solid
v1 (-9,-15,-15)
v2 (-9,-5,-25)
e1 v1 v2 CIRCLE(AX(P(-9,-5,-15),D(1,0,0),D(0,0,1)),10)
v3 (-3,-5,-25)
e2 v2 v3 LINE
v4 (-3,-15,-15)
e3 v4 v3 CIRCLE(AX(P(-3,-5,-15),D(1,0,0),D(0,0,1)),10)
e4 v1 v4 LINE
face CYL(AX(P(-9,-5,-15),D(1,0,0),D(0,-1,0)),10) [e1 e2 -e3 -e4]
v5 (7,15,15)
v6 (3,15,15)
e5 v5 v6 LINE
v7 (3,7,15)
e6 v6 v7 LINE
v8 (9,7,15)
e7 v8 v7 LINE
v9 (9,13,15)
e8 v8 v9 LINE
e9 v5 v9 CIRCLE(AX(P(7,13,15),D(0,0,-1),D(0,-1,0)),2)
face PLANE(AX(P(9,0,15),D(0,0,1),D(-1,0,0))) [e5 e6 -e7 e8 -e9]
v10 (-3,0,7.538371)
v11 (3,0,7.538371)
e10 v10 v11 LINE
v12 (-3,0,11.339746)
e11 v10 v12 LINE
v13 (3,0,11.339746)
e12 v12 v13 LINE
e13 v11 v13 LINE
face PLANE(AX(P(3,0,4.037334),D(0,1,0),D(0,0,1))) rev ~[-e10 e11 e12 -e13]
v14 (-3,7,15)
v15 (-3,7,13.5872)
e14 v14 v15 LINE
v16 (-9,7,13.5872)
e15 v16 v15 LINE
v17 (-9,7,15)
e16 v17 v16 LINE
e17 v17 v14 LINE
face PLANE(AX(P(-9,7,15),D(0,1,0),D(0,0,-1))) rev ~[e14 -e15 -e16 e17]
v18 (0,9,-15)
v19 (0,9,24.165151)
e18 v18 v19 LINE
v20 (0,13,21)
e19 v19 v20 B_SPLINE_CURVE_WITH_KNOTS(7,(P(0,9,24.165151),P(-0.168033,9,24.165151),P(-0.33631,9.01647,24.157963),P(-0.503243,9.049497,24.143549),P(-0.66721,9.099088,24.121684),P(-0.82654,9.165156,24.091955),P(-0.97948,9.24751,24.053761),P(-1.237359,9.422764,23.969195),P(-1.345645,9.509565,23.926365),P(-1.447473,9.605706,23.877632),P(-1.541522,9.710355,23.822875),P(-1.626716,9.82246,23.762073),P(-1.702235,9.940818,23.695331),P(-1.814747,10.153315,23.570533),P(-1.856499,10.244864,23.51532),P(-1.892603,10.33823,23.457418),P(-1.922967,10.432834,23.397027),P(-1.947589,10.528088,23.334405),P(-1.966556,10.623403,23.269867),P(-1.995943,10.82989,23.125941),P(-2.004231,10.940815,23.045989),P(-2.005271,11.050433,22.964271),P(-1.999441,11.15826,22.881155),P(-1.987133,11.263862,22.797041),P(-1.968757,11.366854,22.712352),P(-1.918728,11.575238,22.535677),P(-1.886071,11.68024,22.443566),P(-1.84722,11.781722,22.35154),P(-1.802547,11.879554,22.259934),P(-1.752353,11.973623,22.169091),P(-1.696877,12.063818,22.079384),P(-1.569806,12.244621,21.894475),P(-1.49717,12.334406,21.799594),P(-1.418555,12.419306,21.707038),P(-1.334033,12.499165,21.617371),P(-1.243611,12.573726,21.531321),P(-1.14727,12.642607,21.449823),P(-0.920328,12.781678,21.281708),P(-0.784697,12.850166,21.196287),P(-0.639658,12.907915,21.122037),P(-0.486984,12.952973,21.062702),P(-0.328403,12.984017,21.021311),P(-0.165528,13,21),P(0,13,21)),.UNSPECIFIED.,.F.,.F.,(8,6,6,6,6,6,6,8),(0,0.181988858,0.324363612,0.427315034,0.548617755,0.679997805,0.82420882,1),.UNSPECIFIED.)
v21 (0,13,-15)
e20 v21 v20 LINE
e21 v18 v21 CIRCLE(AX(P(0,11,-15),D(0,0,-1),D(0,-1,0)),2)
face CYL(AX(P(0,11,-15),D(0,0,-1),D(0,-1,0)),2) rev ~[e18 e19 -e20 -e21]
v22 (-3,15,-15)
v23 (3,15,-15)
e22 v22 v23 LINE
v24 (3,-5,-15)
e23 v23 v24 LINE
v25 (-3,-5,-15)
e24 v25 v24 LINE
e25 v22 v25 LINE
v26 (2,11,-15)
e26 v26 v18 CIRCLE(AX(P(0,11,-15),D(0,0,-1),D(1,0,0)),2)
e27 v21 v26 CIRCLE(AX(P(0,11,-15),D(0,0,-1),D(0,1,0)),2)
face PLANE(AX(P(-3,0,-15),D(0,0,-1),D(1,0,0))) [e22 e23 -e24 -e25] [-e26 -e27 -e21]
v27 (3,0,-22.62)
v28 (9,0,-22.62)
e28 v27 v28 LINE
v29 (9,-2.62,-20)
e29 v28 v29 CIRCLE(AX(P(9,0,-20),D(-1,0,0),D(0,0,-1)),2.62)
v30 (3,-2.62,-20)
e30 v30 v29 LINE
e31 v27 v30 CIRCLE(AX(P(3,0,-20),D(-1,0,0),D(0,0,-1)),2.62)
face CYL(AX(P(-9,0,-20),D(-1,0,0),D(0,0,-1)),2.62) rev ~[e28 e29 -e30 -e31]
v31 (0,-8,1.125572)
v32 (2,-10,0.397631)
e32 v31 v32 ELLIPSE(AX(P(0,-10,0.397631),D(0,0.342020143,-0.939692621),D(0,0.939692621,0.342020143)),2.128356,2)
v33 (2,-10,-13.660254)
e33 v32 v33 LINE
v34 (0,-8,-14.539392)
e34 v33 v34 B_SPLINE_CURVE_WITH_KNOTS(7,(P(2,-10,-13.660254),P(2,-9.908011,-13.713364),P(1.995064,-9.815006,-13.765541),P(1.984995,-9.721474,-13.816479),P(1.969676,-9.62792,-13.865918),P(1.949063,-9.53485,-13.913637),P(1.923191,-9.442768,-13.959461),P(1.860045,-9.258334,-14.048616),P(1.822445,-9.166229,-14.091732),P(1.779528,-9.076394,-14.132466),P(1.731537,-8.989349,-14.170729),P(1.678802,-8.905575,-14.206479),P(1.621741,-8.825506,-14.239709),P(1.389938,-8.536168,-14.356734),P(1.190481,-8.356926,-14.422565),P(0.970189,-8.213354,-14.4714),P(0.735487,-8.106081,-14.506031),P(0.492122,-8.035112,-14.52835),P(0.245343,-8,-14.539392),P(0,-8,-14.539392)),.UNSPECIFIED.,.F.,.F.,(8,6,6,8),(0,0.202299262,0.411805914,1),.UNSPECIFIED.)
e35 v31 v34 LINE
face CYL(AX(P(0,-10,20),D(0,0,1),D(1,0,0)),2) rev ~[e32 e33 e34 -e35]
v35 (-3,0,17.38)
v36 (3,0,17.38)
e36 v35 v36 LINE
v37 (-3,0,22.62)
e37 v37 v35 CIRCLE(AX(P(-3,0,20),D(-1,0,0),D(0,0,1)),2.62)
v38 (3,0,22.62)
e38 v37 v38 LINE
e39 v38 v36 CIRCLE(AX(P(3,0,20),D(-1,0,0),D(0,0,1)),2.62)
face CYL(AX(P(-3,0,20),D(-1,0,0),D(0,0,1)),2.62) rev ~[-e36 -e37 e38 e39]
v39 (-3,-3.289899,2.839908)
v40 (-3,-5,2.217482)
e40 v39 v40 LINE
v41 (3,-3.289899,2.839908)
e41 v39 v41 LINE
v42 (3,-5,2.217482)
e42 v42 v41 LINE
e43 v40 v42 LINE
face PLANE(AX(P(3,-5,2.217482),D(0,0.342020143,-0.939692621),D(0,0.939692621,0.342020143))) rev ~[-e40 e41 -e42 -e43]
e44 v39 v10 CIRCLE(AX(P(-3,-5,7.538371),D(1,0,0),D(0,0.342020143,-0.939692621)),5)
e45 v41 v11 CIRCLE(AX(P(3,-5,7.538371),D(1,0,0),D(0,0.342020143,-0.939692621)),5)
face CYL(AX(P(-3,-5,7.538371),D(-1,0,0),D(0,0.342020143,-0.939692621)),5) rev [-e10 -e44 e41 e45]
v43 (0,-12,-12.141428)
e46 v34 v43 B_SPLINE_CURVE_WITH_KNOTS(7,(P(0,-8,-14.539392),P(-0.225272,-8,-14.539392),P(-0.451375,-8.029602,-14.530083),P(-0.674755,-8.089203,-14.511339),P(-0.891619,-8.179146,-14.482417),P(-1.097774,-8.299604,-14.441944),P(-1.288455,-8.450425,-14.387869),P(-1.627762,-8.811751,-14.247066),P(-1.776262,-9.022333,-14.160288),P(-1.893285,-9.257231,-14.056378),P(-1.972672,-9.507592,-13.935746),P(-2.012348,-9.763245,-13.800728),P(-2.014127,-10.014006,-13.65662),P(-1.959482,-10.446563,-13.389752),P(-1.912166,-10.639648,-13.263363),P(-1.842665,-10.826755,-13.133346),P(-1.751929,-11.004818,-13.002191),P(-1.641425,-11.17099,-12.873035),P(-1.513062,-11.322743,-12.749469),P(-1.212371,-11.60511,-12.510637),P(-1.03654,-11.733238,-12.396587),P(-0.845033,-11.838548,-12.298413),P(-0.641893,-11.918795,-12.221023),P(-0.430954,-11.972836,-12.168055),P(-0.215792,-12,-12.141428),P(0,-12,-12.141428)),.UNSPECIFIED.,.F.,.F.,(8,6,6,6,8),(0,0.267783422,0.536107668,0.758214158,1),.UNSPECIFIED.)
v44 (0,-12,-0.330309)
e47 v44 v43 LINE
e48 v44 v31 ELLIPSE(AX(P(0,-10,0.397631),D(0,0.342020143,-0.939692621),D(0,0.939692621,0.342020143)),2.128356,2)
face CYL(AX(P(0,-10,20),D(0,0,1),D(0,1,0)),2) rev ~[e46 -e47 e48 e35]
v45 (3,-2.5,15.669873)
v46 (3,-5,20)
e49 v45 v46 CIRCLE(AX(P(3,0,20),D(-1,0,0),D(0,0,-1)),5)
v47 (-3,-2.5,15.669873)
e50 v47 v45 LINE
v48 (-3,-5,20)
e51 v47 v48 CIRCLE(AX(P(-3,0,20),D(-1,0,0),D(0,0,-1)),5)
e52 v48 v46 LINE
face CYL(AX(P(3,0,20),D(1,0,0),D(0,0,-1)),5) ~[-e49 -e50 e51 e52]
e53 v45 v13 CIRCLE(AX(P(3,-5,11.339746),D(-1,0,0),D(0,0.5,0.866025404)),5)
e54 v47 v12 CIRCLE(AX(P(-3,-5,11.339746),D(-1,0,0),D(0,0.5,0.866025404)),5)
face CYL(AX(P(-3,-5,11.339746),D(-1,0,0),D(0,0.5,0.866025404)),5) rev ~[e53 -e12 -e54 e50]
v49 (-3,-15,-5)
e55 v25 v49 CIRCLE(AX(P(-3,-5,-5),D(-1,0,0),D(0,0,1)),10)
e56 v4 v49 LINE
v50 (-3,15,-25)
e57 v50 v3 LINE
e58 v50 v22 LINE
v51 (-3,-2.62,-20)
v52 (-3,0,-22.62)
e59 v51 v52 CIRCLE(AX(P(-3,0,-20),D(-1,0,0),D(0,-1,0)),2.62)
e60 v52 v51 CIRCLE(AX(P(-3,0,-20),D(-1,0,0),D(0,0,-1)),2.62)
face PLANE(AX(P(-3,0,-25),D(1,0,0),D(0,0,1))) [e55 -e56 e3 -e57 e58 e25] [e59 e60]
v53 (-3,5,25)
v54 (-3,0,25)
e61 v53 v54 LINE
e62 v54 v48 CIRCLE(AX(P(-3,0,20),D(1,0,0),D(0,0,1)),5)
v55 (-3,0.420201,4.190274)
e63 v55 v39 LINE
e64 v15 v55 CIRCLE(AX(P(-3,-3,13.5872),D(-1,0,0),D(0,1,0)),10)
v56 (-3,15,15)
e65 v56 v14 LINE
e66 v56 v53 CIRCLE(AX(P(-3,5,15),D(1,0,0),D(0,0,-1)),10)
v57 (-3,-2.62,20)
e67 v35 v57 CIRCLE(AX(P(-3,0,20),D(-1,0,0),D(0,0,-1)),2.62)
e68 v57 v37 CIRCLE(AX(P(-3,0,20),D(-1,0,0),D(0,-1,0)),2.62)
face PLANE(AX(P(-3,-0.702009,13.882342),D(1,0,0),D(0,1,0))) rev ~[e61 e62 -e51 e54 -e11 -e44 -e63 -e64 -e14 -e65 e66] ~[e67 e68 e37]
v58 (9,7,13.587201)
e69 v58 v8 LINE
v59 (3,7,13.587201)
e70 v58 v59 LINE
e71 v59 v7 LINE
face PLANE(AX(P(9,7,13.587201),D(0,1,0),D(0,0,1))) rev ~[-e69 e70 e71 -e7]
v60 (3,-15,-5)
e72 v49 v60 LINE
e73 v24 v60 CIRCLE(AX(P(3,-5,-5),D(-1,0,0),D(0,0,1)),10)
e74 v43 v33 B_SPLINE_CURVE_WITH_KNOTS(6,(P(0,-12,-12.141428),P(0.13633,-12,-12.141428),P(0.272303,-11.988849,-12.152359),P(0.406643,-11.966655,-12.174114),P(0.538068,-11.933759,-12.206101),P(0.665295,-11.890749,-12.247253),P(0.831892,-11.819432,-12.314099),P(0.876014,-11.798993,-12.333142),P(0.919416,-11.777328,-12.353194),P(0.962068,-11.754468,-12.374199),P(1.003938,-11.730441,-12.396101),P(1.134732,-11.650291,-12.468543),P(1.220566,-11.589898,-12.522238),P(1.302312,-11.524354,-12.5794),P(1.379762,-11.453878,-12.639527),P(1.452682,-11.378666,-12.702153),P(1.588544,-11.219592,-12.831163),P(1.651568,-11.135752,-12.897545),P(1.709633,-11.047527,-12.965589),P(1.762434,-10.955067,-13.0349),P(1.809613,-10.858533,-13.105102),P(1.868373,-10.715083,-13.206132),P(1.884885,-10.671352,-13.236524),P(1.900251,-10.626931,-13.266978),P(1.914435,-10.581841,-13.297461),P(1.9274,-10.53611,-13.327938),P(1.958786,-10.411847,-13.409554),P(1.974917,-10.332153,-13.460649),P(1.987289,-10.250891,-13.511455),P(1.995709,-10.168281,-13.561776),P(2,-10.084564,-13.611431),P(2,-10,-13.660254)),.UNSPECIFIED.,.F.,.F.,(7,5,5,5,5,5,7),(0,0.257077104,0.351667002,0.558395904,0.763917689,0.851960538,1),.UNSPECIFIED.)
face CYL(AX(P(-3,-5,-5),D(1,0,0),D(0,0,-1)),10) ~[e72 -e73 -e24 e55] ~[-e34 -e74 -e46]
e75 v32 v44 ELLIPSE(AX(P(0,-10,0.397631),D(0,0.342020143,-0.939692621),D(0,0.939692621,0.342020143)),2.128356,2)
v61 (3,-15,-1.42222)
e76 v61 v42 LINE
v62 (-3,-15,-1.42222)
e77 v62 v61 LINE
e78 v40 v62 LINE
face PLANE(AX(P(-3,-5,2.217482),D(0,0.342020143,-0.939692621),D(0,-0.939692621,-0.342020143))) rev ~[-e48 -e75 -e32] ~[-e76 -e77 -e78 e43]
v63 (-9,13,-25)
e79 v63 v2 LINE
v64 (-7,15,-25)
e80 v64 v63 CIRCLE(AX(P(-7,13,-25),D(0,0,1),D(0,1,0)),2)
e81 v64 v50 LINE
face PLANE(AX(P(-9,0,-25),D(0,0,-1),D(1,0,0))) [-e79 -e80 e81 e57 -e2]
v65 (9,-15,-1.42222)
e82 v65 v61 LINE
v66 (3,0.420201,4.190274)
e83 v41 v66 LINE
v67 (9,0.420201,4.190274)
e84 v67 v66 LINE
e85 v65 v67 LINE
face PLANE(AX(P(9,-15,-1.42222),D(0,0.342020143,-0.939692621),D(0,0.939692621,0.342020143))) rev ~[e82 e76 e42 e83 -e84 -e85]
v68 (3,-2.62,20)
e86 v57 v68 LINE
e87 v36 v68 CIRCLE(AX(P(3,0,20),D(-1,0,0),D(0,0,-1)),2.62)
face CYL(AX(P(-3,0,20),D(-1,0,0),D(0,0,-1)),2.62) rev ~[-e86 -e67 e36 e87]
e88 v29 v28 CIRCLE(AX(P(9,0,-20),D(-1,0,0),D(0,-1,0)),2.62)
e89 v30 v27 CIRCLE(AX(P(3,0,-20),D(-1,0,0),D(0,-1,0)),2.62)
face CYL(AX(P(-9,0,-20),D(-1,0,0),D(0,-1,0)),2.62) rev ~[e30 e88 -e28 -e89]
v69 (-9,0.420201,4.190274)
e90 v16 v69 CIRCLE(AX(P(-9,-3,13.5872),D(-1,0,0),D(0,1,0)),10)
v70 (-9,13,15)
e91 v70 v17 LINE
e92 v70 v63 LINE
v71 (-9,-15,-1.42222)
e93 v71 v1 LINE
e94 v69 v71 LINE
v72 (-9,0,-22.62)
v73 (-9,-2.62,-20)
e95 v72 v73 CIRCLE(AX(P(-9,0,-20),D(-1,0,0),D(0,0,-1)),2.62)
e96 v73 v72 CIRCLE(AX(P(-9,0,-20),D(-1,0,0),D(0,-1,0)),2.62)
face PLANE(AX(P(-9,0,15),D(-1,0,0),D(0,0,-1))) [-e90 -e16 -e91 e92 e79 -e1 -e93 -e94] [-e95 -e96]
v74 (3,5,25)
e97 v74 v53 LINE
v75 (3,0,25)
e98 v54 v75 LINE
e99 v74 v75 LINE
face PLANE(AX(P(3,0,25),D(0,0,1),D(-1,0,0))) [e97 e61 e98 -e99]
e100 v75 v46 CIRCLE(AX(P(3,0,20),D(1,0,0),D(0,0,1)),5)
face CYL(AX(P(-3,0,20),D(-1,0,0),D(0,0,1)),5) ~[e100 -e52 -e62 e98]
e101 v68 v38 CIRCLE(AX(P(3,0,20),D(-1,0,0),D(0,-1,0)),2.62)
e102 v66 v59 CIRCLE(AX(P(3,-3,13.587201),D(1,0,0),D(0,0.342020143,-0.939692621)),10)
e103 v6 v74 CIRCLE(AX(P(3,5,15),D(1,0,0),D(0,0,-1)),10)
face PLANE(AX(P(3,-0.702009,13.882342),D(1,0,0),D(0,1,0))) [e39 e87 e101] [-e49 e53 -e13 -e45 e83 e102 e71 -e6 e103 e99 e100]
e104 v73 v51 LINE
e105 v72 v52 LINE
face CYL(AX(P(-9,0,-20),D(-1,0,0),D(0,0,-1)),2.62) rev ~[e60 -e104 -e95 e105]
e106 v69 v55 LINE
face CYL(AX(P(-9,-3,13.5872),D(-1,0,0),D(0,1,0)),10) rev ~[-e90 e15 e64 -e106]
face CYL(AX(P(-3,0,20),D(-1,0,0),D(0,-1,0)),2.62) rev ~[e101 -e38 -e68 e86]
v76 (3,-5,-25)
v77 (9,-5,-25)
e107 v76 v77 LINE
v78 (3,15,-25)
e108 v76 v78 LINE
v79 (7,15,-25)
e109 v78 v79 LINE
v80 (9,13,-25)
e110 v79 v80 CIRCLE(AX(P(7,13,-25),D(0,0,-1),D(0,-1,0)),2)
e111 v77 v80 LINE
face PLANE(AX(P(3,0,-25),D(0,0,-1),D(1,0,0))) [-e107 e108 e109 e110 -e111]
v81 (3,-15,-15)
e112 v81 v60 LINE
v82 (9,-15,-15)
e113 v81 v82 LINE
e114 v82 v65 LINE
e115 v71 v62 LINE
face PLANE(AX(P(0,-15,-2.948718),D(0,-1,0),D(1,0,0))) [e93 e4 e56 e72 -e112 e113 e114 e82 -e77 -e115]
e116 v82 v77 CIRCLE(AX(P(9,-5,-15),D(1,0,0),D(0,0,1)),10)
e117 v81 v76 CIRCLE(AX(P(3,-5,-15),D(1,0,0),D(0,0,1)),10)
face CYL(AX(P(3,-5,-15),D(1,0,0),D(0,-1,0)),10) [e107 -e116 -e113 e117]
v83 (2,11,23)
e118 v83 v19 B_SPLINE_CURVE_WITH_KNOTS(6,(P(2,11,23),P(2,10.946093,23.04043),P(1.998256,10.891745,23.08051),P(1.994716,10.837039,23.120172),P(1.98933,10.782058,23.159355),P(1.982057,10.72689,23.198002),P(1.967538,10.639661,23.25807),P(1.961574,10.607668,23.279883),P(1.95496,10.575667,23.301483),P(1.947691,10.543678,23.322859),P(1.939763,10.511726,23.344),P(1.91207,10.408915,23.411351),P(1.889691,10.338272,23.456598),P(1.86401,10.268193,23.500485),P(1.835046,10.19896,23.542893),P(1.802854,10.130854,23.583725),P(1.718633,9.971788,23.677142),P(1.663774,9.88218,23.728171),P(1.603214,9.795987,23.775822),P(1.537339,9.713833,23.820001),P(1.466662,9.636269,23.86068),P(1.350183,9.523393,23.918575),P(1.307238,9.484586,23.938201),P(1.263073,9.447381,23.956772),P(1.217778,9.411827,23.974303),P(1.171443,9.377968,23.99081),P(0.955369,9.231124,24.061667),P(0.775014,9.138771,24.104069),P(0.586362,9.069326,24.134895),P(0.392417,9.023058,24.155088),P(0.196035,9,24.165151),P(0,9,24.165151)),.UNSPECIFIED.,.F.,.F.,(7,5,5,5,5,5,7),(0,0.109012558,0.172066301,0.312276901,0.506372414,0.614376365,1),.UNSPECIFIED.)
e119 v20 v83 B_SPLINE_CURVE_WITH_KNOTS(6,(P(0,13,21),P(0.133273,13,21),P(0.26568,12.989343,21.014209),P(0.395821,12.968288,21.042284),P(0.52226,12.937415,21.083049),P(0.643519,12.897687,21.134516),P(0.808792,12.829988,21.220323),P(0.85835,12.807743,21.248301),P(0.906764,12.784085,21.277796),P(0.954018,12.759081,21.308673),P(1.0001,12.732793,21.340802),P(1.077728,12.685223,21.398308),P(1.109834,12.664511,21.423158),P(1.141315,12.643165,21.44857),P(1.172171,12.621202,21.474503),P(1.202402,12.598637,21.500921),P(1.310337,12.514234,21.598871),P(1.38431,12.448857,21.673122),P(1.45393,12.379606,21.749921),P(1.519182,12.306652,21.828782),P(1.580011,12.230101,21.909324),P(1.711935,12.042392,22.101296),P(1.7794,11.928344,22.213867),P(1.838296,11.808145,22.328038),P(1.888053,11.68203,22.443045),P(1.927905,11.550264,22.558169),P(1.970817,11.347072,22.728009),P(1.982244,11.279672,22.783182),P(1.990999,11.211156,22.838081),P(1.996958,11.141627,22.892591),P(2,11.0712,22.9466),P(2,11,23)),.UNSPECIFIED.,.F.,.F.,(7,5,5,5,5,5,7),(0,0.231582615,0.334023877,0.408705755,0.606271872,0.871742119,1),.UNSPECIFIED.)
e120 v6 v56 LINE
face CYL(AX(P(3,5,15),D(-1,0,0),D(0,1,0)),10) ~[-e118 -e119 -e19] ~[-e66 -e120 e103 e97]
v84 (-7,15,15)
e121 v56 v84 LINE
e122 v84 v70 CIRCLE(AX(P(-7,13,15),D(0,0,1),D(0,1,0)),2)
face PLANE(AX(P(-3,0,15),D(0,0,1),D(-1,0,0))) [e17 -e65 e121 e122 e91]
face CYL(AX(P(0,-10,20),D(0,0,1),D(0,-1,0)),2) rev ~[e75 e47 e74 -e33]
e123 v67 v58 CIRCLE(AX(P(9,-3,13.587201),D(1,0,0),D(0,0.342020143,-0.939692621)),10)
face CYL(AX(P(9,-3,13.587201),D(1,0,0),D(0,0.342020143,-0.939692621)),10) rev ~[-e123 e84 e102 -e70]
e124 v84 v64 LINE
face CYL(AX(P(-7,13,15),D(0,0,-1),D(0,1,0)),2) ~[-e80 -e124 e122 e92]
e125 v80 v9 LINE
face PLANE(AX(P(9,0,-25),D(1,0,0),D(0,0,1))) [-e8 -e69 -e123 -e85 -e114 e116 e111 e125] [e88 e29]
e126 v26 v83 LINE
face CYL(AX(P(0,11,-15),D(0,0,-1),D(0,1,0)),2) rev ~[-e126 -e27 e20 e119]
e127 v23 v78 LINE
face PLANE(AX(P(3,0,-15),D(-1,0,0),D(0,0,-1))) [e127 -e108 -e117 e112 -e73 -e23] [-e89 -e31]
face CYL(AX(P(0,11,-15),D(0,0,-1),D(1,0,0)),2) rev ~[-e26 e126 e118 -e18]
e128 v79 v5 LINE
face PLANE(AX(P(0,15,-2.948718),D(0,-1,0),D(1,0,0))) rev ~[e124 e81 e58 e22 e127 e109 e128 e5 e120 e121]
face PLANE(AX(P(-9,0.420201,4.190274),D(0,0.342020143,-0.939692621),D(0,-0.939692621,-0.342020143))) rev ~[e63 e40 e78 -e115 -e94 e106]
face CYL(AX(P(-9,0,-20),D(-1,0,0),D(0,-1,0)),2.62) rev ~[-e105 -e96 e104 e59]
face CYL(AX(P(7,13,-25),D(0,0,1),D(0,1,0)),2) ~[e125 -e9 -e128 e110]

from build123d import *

# Parameters (mm, degrees)
F1_DEPTH     = 15
F3_DEPTH     = 6
F5_DEPTH     = 18
F6_R         = 10
F9_DEPTH     = 6
F10_DEPTH    = 6
F11_R        = 2
F13_DEPTH    = 6
F15_R        = 10
F19_DEPTH    = 45.001
F21_DEPTH    = 40.001
F23_DEPTH    = 6
F24_T1_DEPTH = 6


# Not quite as in the source:
# - a fillet or chamfer that OpenCascade refuses, or shapes differently, is made with other operations: its cross-section is extruded or revolved along the edge and cut away or added


with BuildPart() as f1:
    # F0 (on Front) → F1 (new body, symmetric)
    with BuildSketch(Plane.XZ):
        Polygon((9, -15), (9, 15), (3, 15), (3, 25), (-3, 25), (-3, 15), (-9, 15), (-9, -15), (-9, -25), (-3, -25), (-3, -15), (3, -15), (3, -25), (9, -25), align=None)
    extrude(amount=F1_DEPTH, both=True)

    # F2 (on face) → F3 (cut)
    with BuildSketch(Plane(origin=(-3, 0, 0), x_dir=(0, -1, 0), z_dir=(-1, 0, 0))):
        with BuildLine():
            ThreePointArc((0, 22.62), (-2.62, 20), (0, 17.38))
            Line((0, 17.38), (0, 22.62))
        make_face()
        with BuildLine():
            Line((0, 22.62), (0, 17.38))
            ThreePointArc((0, 17.38), (1.8526197667, 18.1473802333), (2.62, 20))
            ThreePointArc((2.62, 20), (1.8526197667, 21.8526197667), (0, 22.62))
        make_face()
    extrude(amount=-F3_DEPTH, mode=Mode.SUBTRACT)

    # F4 (on face) → F5 (cut)
    with BuildSketch(Plane(origin=(-9, 0, 0), x_dir=(0, -1, 0), z_dir=(-1, 0, 0))):
        with BuildLine():
            ThreePointArc((0, -22.62), (1.8526197667, -21.8526197667), (2.62, -20))
            ThreePointArc((2.62, -20), (-1.8526197667, -18.1473802333), (0, -22.62))
        make_face()
    extrude(amount=-F5_DEPTH, mode=Mode.SUBTRACT)

    # F6
    f6_edges = [f1.edges().sort_by_distance(p)[0] for p in [
        (0, 15, 25),
        (0, -15, 25),
        (6, -15, -25),
        (-6, -15, -25),
    ]]
    fillet(f6_edges, radius=F6_R)

    # F8 (on face) → F9 (cut)
    with BuildSketch(Plane(origin=(-9, 0, 0), x_dir=(0, -1, 0), z_dir=(-1, 0, 0))):
        with BuildLine():
            ThreePointArc((-7, 13.5872004348), (-5.1915204429, 7.8514360713), (-0.4202014333, 4.190274227))
            Line((-0.4202014333, 4.190274227), (15, -1.4222201011))
            Line((15, -1.4222201011), (15, 15))
            Line((15, 15), (-7, 15))
            Line((-7, 15), (-7, 13.5872004348))
        make_face()
    extrude(amount=-F9_DEPTH, mode=Mode.SUBTRACT)

    # F7 (on face) → F10 (cut)
    with BuildSketch(Plane.YZ.offset(9)):
        with BuildLine():
            Line((7, 15), (-15, 15))
            Line((-15, 15), (-15, -1.42222))
            Line((-15, -1.42222), (0.4202014333, 4.1902743281))
            ThreePointArc((0.4202014333, 4.1902743281), (5.1915204429, 7.8514361724), (7, 13.587200536))
            Line((7, 13.587200536), (7, 15))
        make_face()
    extrude(amount=-F10_DEPTH, mode=Mode.SUBTRACT)

    # F11
    f11_edges = [f1.edges().sort_by_distance(p)[0] for p in [
        (9, 15, -5),
        (-9, 15, -5),
    ]]
    fillet(f11_edges, radius=F11_R)

    # F12 (on face) → F13 (cut)
    with BuildSketch(Plane(origin=(-3, 0, 0), x_dir=(0, -1, 0), z_dir=(-1, 0, 0))):
        with BuildLine():
            Line((5, 25), (0, 25))
            ThreePointArc((0, 25), (3.5355339059, 23.5355339059), (5, 20))
            Line((5, 20), (5, 2.2174822415))
            Line((5, 2.2174822415), (15, -1.4222201011))
            Line((15, -1.4222201011), (15, 15))
            ThreePointArc((15, 15), (12.0710678119, 22.0710678119), (5, 25))
        make_face()
    extrude(amount=-F13_DEPTH, mode=Mode.SUBTRACT)

    # F15
    f15_edges = [f1.edges().sort_by_distance(p)[0] for p in [
        (0, -15, -15),
    ]]
    fillet(f15_edges, radius=F15_R)

    # F18 (on face) → F19 (cut, through all)
    with BuildSketch(Plane.XY.offset(20)):
        with BuildLine():
            ThreePointArc((2, -10), (1.4142135624, -8.5857864376), (0, -8))
            Line((0, -8), (0, -12))
            ThreePointArc((0, -12), (1.4142135624, -11.4142135624), (2, -10))
        make_face()
        with BuildLine():
            Line((0, -12), (0, -8))
            ThreePointArc((0, -8), (-2, -10), (0, -12))
        make_face()
    extrude(amount=-F19_DEPTH, mode=Mode.SUBTRACT)

    # F20 (on face) → F21 (cut, through all)
    with BuildSketch(Plane(origin=(0, 0, -15), x_dir=(1, 0, 0), z_dir=(0, 0, -1))):
        with BuildLine():
            ThreePointArc((0, -9), (-2, -11), (0, -13))
            Line((0, -13), (0, -11))
            Line((0, -11), (0, -9))
        make_face()
        with BuildLine():
            Line((0, -11), (0, -13))
            ThreePointArc((0, -13), (1.4142135624, -12.4142135624), (2, -11))
            ThreePointArc((2, -11), (1.4142135624, -9.5857864376), (0, -9))
            Line((0, -9), (0, -11))
        make_face()
    extrude(amount=-F21_DEPTH, mode=Mode.SUBTRACT)

    # F22 (on face) → F23 (cut)
    with BuildSketch(Plane.YZ.offset(3)):
        with BuildLine():
            ThreePointArc((0, 15), (-3.5355339059, 16.4644660941), (-5, 20))
            Line((-5, 20), (-5, 2.2174822415))
            Line((-5.0000000325, 2.2174823308), (0, 4.037333514))
            Line((0, 4.037333514), (0, 15))
        make_face()
    extrude(amount=-F23_DEPTH, mode=Mode.SUBTRACT)

    # F24: fillet of radius 5 on 2 edges, made by hand

    # F24_s2 → F24_t1 (join)
    with BuildSketch(Plane.YZ.offset(-3)):
        with BuildLine():
            ThreePointArc((-2.5, 15.6698729811), (-0.6698729811, 13.8397459622), (0, 11.3397459622))
            Line((0, 11.3397459622), (0, 15))
            ThreePointArc((0, 15), (-1.2940952255, 15.1703708686), (-2.5, 15.6698729811))
        make_face()
        with BuildLine():
            ThreePointArc((-3.2898992834, 2.8399081011), (-0.9042397786, 4.6704890233), (0, 7.538371205))
            Line((0, 7.538371205), (0, 4.037333514))
            Line((0, 4.037333514), (-3.2898992834, 2.8399081011))
        make_face()
    extrude(amount=F24_T1_DEPTH)


solid = f1.part
